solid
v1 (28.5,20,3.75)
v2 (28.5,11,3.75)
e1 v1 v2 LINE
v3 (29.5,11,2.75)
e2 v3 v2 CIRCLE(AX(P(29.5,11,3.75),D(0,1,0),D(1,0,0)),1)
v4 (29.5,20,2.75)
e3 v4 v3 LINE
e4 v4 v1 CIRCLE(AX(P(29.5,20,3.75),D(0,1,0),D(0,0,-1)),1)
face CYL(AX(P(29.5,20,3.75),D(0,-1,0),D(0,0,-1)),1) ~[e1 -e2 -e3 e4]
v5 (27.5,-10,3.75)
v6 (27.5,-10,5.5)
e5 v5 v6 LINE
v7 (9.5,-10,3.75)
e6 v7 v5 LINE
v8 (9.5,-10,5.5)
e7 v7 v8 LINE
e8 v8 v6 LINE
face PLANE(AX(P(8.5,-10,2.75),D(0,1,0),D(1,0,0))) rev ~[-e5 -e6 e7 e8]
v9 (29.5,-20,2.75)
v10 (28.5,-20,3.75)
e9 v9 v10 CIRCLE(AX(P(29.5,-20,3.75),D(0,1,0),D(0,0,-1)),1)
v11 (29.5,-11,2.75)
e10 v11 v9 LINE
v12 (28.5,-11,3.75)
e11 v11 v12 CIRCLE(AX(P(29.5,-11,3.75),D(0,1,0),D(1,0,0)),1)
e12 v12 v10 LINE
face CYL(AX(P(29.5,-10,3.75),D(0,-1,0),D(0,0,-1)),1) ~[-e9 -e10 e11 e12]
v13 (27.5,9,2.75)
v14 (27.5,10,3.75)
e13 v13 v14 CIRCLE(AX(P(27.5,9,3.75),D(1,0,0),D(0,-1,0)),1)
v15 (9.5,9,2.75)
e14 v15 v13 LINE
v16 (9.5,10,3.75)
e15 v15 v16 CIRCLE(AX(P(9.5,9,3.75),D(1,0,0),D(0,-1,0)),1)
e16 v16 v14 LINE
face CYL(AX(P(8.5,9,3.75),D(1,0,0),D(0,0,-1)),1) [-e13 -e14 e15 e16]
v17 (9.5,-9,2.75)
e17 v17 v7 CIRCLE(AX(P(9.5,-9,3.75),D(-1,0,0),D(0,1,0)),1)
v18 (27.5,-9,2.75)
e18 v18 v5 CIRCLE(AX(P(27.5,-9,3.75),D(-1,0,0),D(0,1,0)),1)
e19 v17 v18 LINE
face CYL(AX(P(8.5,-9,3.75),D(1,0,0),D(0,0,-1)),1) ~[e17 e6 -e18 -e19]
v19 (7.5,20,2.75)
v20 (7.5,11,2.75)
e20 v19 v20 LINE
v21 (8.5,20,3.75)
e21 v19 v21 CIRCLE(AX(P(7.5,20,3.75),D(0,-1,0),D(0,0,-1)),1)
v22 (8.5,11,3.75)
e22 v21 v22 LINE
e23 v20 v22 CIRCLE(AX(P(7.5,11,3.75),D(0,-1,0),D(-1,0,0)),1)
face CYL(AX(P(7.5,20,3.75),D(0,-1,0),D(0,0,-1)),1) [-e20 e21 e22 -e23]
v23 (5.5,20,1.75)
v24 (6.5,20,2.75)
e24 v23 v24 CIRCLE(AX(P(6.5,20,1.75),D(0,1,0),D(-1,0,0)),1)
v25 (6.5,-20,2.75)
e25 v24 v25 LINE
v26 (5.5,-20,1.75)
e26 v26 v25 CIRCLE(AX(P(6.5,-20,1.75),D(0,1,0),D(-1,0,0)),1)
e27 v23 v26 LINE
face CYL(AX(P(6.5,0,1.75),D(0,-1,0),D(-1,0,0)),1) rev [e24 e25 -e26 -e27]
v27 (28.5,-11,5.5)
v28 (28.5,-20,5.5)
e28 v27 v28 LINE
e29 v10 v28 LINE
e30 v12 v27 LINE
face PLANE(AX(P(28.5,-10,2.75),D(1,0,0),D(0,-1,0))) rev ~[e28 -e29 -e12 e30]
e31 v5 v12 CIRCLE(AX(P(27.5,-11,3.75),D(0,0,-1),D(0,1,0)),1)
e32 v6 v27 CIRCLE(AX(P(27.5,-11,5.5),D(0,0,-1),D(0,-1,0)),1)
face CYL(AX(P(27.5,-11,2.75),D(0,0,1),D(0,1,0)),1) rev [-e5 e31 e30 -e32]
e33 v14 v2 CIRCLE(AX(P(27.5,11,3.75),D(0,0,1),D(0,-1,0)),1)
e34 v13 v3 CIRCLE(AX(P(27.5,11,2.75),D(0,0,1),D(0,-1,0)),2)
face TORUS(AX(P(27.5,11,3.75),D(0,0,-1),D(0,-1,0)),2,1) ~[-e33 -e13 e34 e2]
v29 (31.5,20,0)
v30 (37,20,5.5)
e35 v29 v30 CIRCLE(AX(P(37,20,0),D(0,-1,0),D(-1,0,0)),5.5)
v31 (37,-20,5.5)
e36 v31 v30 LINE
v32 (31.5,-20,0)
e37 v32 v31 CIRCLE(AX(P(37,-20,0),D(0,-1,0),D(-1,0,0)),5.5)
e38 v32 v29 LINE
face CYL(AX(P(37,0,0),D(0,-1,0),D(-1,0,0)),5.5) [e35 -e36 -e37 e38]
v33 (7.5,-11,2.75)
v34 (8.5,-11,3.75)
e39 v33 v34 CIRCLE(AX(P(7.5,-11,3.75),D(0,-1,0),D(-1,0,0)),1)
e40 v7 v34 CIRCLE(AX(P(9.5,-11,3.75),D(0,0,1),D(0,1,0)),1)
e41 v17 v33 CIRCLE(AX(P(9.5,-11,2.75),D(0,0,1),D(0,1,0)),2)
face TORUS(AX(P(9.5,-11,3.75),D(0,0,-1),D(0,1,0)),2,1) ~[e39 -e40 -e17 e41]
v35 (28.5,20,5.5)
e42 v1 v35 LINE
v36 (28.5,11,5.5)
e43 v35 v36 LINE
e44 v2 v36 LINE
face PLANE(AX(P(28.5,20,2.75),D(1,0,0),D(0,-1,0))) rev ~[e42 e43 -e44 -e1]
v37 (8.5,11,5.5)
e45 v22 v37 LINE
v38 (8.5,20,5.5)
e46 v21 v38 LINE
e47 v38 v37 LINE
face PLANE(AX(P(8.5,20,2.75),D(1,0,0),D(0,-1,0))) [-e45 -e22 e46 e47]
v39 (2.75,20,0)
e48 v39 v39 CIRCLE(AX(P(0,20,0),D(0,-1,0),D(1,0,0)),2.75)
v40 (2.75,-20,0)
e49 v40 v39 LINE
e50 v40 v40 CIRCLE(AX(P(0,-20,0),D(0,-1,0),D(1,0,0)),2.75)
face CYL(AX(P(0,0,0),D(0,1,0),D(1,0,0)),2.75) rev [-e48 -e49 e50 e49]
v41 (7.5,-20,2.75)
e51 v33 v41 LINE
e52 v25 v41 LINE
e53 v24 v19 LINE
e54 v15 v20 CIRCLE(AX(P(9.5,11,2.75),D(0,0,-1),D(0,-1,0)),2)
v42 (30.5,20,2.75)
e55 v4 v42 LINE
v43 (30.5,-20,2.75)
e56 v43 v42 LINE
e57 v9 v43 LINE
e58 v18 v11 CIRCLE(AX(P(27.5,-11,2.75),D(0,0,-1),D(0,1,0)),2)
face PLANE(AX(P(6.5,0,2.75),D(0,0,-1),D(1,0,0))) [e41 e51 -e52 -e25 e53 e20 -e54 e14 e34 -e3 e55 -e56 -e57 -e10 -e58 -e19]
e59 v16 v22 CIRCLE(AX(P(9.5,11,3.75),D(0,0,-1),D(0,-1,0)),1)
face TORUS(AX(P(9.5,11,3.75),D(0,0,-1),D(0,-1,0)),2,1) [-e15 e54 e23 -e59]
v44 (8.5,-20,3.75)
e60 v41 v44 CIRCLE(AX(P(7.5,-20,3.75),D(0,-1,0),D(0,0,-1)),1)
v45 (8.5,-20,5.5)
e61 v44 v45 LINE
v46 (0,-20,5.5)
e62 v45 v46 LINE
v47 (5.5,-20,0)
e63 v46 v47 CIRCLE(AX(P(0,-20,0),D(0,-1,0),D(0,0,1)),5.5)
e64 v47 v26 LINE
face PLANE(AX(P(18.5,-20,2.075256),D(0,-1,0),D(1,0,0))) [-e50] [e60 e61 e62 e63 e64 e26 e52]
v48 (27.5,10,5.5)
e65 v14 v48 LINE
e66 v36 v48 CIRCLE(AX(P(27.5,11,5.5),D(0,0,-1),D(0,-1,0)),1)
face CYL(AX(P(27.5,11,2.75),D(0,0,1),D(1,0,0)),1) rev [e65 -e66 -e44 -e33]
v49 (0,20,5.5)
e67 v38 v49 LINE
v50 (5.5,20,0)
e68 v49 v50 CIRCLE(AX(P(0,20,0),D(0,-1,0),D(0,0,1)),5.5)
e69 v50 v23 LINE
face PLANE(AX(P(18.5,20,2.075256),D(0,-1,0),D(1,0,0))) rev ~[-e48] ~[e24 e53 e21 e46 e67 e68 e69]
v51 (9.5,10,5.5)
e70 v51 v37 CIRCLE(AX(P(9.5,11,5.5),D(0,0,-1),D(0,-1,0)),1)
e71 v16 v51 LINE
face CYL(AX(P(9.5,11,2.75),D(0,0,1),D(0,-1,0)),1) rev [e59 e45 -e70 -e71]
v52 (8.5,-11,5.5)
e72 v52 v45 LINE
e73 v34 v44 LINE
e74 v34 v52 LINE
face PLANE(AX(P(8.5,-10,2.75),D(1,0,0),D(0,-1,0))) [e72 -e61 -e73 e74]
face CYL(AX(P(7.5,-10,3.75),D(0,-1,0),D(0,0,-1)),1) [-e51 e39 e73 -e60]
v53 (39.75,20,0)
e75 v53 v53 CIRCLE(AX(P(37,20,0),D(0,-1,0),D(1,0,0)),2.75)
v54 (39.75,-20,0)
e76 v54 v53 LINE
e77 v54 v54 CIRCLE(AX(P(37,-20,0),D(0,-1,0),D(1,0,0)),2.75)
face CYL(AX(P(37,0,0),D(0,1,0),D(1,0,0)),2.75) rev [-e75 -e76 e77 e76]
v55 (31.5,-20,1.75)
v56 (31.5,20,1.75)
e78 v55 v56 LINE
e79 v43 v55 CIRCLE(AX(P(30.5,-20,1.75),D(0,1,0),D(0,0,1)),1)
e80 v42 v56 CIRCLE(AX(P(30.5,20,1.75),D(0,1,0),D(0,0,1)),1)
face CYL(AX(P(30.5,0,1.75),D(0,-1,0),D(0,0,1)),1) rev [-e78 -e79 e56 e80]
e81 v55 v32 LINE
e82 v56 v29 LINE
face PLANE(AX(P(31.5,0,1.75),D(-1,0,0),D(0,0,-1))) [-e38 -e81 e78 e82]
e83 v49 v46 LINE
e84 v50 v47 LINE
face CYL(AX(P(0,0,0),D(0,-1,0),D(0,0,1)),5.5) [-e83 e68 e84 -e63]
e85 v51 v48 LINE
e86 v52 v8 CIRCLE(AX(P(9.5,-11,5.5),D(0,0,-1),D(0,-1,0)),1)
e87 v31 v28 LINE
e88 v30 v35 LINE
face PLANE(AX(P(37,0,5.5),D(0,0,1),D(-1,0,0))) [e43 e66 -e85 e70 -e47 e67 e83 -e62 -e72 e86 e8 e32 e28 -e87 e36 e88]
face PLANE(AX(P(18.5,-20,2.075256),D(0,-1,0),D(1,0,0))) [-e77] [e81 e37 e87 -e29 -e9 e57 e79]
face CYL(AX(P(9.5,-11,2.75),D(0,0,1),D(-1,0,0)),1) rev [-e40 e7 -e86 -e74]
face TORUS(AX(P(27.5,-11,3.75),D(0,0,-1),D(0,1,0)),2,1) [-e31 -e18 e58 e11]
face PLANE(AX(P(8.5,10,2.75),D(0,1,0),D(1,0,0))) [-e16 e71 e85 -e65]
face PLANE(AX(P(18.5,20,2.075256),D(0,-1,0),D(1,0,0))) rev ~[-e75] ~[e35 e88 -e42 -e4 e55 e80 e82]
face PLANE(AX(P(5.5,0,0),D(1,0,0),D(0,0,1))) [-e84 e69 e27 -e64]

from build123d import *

# Parameters (mm, degrees)
F0_R          = 2.75
F1_DEPTH      = 20
F1_DEPTH_BACK = 20
F2_W          = 20
F2_H          = 10
F3_DEPTH      = 2.75
F4_R          = 1


with BuildPart() as f1:
    # F0 (on Front) → F1 (new body, two sides)
    with BuildSketch(Plane.XZ) as f1_sk:
        with BuildLine():
            Line((37, 5.5), (0, 5.5))
            ThreePointArc((0, 5.5), (-3.8890872965, -3.8890872965), (5.5, 0))
            Line((5.5, 0), (5.5, 1.75))
            ThreePointArc((5.5, 1.75), (5.7928932188, 2.4571067812), (6.5, 2.75))
            Line((6.5, 2.75), (30.5, 2.75))
            ThreePointArc((30.5, 2.75), (31.2071067812, 2.4571067812), (31.5, 1.75))
            Line((31.5, 1.75), (31.5, 0))
            ThreePointArc((31.5, 0), (40.8890872965, -3.8890872965), (37, 5.5))
        make_face()
        Circle(F0_R, mode=Mode.SUBTRACT)
        with Locations((37, 0)):
            Circle(F0_R, mode=Mode.SUBTRACT)
    extrude(amount=F1_DEPTH)
    extrude(f1_sk.sketch, amount=-F1_DEPTH_BACK)

    # F2 (on face) → F3 (cut, through all)
    with BuildSketch(Plane(origin=(0, 0, 2.75), x_dir=(1, 0, 0), z_dir=(0, 0, -1))):
        with Locations((18.5, -15)):
            Rectangle(F2_W, F2_H)
        with Locations((18.5, 15)):
            Rectangle(F2_W, F2_H)
    extrude(amount=-F3_DEPTH, mode=Mode.SUBTRACT)

    # F4
    f4_edges = [f1.edges().sort_by_distance(p)[0] for p in [
        (8.5, -15, 2.75),
        (8.5, 15, 2.75),
        (28.5, 15, 2.75),
        (28.5, -15, 2.75),
        (8.5, -10, 4.125),
        (28.5, -10, 4.125),
        (28.5, 10, 4.125),
        (8.5, 10, 4.125),
        (18.5, 10, 2.75),
        (18.5, -10, 2.75),
    ]]
    fillet(f4_edges, radius=F4_R)


solid = f1.part
